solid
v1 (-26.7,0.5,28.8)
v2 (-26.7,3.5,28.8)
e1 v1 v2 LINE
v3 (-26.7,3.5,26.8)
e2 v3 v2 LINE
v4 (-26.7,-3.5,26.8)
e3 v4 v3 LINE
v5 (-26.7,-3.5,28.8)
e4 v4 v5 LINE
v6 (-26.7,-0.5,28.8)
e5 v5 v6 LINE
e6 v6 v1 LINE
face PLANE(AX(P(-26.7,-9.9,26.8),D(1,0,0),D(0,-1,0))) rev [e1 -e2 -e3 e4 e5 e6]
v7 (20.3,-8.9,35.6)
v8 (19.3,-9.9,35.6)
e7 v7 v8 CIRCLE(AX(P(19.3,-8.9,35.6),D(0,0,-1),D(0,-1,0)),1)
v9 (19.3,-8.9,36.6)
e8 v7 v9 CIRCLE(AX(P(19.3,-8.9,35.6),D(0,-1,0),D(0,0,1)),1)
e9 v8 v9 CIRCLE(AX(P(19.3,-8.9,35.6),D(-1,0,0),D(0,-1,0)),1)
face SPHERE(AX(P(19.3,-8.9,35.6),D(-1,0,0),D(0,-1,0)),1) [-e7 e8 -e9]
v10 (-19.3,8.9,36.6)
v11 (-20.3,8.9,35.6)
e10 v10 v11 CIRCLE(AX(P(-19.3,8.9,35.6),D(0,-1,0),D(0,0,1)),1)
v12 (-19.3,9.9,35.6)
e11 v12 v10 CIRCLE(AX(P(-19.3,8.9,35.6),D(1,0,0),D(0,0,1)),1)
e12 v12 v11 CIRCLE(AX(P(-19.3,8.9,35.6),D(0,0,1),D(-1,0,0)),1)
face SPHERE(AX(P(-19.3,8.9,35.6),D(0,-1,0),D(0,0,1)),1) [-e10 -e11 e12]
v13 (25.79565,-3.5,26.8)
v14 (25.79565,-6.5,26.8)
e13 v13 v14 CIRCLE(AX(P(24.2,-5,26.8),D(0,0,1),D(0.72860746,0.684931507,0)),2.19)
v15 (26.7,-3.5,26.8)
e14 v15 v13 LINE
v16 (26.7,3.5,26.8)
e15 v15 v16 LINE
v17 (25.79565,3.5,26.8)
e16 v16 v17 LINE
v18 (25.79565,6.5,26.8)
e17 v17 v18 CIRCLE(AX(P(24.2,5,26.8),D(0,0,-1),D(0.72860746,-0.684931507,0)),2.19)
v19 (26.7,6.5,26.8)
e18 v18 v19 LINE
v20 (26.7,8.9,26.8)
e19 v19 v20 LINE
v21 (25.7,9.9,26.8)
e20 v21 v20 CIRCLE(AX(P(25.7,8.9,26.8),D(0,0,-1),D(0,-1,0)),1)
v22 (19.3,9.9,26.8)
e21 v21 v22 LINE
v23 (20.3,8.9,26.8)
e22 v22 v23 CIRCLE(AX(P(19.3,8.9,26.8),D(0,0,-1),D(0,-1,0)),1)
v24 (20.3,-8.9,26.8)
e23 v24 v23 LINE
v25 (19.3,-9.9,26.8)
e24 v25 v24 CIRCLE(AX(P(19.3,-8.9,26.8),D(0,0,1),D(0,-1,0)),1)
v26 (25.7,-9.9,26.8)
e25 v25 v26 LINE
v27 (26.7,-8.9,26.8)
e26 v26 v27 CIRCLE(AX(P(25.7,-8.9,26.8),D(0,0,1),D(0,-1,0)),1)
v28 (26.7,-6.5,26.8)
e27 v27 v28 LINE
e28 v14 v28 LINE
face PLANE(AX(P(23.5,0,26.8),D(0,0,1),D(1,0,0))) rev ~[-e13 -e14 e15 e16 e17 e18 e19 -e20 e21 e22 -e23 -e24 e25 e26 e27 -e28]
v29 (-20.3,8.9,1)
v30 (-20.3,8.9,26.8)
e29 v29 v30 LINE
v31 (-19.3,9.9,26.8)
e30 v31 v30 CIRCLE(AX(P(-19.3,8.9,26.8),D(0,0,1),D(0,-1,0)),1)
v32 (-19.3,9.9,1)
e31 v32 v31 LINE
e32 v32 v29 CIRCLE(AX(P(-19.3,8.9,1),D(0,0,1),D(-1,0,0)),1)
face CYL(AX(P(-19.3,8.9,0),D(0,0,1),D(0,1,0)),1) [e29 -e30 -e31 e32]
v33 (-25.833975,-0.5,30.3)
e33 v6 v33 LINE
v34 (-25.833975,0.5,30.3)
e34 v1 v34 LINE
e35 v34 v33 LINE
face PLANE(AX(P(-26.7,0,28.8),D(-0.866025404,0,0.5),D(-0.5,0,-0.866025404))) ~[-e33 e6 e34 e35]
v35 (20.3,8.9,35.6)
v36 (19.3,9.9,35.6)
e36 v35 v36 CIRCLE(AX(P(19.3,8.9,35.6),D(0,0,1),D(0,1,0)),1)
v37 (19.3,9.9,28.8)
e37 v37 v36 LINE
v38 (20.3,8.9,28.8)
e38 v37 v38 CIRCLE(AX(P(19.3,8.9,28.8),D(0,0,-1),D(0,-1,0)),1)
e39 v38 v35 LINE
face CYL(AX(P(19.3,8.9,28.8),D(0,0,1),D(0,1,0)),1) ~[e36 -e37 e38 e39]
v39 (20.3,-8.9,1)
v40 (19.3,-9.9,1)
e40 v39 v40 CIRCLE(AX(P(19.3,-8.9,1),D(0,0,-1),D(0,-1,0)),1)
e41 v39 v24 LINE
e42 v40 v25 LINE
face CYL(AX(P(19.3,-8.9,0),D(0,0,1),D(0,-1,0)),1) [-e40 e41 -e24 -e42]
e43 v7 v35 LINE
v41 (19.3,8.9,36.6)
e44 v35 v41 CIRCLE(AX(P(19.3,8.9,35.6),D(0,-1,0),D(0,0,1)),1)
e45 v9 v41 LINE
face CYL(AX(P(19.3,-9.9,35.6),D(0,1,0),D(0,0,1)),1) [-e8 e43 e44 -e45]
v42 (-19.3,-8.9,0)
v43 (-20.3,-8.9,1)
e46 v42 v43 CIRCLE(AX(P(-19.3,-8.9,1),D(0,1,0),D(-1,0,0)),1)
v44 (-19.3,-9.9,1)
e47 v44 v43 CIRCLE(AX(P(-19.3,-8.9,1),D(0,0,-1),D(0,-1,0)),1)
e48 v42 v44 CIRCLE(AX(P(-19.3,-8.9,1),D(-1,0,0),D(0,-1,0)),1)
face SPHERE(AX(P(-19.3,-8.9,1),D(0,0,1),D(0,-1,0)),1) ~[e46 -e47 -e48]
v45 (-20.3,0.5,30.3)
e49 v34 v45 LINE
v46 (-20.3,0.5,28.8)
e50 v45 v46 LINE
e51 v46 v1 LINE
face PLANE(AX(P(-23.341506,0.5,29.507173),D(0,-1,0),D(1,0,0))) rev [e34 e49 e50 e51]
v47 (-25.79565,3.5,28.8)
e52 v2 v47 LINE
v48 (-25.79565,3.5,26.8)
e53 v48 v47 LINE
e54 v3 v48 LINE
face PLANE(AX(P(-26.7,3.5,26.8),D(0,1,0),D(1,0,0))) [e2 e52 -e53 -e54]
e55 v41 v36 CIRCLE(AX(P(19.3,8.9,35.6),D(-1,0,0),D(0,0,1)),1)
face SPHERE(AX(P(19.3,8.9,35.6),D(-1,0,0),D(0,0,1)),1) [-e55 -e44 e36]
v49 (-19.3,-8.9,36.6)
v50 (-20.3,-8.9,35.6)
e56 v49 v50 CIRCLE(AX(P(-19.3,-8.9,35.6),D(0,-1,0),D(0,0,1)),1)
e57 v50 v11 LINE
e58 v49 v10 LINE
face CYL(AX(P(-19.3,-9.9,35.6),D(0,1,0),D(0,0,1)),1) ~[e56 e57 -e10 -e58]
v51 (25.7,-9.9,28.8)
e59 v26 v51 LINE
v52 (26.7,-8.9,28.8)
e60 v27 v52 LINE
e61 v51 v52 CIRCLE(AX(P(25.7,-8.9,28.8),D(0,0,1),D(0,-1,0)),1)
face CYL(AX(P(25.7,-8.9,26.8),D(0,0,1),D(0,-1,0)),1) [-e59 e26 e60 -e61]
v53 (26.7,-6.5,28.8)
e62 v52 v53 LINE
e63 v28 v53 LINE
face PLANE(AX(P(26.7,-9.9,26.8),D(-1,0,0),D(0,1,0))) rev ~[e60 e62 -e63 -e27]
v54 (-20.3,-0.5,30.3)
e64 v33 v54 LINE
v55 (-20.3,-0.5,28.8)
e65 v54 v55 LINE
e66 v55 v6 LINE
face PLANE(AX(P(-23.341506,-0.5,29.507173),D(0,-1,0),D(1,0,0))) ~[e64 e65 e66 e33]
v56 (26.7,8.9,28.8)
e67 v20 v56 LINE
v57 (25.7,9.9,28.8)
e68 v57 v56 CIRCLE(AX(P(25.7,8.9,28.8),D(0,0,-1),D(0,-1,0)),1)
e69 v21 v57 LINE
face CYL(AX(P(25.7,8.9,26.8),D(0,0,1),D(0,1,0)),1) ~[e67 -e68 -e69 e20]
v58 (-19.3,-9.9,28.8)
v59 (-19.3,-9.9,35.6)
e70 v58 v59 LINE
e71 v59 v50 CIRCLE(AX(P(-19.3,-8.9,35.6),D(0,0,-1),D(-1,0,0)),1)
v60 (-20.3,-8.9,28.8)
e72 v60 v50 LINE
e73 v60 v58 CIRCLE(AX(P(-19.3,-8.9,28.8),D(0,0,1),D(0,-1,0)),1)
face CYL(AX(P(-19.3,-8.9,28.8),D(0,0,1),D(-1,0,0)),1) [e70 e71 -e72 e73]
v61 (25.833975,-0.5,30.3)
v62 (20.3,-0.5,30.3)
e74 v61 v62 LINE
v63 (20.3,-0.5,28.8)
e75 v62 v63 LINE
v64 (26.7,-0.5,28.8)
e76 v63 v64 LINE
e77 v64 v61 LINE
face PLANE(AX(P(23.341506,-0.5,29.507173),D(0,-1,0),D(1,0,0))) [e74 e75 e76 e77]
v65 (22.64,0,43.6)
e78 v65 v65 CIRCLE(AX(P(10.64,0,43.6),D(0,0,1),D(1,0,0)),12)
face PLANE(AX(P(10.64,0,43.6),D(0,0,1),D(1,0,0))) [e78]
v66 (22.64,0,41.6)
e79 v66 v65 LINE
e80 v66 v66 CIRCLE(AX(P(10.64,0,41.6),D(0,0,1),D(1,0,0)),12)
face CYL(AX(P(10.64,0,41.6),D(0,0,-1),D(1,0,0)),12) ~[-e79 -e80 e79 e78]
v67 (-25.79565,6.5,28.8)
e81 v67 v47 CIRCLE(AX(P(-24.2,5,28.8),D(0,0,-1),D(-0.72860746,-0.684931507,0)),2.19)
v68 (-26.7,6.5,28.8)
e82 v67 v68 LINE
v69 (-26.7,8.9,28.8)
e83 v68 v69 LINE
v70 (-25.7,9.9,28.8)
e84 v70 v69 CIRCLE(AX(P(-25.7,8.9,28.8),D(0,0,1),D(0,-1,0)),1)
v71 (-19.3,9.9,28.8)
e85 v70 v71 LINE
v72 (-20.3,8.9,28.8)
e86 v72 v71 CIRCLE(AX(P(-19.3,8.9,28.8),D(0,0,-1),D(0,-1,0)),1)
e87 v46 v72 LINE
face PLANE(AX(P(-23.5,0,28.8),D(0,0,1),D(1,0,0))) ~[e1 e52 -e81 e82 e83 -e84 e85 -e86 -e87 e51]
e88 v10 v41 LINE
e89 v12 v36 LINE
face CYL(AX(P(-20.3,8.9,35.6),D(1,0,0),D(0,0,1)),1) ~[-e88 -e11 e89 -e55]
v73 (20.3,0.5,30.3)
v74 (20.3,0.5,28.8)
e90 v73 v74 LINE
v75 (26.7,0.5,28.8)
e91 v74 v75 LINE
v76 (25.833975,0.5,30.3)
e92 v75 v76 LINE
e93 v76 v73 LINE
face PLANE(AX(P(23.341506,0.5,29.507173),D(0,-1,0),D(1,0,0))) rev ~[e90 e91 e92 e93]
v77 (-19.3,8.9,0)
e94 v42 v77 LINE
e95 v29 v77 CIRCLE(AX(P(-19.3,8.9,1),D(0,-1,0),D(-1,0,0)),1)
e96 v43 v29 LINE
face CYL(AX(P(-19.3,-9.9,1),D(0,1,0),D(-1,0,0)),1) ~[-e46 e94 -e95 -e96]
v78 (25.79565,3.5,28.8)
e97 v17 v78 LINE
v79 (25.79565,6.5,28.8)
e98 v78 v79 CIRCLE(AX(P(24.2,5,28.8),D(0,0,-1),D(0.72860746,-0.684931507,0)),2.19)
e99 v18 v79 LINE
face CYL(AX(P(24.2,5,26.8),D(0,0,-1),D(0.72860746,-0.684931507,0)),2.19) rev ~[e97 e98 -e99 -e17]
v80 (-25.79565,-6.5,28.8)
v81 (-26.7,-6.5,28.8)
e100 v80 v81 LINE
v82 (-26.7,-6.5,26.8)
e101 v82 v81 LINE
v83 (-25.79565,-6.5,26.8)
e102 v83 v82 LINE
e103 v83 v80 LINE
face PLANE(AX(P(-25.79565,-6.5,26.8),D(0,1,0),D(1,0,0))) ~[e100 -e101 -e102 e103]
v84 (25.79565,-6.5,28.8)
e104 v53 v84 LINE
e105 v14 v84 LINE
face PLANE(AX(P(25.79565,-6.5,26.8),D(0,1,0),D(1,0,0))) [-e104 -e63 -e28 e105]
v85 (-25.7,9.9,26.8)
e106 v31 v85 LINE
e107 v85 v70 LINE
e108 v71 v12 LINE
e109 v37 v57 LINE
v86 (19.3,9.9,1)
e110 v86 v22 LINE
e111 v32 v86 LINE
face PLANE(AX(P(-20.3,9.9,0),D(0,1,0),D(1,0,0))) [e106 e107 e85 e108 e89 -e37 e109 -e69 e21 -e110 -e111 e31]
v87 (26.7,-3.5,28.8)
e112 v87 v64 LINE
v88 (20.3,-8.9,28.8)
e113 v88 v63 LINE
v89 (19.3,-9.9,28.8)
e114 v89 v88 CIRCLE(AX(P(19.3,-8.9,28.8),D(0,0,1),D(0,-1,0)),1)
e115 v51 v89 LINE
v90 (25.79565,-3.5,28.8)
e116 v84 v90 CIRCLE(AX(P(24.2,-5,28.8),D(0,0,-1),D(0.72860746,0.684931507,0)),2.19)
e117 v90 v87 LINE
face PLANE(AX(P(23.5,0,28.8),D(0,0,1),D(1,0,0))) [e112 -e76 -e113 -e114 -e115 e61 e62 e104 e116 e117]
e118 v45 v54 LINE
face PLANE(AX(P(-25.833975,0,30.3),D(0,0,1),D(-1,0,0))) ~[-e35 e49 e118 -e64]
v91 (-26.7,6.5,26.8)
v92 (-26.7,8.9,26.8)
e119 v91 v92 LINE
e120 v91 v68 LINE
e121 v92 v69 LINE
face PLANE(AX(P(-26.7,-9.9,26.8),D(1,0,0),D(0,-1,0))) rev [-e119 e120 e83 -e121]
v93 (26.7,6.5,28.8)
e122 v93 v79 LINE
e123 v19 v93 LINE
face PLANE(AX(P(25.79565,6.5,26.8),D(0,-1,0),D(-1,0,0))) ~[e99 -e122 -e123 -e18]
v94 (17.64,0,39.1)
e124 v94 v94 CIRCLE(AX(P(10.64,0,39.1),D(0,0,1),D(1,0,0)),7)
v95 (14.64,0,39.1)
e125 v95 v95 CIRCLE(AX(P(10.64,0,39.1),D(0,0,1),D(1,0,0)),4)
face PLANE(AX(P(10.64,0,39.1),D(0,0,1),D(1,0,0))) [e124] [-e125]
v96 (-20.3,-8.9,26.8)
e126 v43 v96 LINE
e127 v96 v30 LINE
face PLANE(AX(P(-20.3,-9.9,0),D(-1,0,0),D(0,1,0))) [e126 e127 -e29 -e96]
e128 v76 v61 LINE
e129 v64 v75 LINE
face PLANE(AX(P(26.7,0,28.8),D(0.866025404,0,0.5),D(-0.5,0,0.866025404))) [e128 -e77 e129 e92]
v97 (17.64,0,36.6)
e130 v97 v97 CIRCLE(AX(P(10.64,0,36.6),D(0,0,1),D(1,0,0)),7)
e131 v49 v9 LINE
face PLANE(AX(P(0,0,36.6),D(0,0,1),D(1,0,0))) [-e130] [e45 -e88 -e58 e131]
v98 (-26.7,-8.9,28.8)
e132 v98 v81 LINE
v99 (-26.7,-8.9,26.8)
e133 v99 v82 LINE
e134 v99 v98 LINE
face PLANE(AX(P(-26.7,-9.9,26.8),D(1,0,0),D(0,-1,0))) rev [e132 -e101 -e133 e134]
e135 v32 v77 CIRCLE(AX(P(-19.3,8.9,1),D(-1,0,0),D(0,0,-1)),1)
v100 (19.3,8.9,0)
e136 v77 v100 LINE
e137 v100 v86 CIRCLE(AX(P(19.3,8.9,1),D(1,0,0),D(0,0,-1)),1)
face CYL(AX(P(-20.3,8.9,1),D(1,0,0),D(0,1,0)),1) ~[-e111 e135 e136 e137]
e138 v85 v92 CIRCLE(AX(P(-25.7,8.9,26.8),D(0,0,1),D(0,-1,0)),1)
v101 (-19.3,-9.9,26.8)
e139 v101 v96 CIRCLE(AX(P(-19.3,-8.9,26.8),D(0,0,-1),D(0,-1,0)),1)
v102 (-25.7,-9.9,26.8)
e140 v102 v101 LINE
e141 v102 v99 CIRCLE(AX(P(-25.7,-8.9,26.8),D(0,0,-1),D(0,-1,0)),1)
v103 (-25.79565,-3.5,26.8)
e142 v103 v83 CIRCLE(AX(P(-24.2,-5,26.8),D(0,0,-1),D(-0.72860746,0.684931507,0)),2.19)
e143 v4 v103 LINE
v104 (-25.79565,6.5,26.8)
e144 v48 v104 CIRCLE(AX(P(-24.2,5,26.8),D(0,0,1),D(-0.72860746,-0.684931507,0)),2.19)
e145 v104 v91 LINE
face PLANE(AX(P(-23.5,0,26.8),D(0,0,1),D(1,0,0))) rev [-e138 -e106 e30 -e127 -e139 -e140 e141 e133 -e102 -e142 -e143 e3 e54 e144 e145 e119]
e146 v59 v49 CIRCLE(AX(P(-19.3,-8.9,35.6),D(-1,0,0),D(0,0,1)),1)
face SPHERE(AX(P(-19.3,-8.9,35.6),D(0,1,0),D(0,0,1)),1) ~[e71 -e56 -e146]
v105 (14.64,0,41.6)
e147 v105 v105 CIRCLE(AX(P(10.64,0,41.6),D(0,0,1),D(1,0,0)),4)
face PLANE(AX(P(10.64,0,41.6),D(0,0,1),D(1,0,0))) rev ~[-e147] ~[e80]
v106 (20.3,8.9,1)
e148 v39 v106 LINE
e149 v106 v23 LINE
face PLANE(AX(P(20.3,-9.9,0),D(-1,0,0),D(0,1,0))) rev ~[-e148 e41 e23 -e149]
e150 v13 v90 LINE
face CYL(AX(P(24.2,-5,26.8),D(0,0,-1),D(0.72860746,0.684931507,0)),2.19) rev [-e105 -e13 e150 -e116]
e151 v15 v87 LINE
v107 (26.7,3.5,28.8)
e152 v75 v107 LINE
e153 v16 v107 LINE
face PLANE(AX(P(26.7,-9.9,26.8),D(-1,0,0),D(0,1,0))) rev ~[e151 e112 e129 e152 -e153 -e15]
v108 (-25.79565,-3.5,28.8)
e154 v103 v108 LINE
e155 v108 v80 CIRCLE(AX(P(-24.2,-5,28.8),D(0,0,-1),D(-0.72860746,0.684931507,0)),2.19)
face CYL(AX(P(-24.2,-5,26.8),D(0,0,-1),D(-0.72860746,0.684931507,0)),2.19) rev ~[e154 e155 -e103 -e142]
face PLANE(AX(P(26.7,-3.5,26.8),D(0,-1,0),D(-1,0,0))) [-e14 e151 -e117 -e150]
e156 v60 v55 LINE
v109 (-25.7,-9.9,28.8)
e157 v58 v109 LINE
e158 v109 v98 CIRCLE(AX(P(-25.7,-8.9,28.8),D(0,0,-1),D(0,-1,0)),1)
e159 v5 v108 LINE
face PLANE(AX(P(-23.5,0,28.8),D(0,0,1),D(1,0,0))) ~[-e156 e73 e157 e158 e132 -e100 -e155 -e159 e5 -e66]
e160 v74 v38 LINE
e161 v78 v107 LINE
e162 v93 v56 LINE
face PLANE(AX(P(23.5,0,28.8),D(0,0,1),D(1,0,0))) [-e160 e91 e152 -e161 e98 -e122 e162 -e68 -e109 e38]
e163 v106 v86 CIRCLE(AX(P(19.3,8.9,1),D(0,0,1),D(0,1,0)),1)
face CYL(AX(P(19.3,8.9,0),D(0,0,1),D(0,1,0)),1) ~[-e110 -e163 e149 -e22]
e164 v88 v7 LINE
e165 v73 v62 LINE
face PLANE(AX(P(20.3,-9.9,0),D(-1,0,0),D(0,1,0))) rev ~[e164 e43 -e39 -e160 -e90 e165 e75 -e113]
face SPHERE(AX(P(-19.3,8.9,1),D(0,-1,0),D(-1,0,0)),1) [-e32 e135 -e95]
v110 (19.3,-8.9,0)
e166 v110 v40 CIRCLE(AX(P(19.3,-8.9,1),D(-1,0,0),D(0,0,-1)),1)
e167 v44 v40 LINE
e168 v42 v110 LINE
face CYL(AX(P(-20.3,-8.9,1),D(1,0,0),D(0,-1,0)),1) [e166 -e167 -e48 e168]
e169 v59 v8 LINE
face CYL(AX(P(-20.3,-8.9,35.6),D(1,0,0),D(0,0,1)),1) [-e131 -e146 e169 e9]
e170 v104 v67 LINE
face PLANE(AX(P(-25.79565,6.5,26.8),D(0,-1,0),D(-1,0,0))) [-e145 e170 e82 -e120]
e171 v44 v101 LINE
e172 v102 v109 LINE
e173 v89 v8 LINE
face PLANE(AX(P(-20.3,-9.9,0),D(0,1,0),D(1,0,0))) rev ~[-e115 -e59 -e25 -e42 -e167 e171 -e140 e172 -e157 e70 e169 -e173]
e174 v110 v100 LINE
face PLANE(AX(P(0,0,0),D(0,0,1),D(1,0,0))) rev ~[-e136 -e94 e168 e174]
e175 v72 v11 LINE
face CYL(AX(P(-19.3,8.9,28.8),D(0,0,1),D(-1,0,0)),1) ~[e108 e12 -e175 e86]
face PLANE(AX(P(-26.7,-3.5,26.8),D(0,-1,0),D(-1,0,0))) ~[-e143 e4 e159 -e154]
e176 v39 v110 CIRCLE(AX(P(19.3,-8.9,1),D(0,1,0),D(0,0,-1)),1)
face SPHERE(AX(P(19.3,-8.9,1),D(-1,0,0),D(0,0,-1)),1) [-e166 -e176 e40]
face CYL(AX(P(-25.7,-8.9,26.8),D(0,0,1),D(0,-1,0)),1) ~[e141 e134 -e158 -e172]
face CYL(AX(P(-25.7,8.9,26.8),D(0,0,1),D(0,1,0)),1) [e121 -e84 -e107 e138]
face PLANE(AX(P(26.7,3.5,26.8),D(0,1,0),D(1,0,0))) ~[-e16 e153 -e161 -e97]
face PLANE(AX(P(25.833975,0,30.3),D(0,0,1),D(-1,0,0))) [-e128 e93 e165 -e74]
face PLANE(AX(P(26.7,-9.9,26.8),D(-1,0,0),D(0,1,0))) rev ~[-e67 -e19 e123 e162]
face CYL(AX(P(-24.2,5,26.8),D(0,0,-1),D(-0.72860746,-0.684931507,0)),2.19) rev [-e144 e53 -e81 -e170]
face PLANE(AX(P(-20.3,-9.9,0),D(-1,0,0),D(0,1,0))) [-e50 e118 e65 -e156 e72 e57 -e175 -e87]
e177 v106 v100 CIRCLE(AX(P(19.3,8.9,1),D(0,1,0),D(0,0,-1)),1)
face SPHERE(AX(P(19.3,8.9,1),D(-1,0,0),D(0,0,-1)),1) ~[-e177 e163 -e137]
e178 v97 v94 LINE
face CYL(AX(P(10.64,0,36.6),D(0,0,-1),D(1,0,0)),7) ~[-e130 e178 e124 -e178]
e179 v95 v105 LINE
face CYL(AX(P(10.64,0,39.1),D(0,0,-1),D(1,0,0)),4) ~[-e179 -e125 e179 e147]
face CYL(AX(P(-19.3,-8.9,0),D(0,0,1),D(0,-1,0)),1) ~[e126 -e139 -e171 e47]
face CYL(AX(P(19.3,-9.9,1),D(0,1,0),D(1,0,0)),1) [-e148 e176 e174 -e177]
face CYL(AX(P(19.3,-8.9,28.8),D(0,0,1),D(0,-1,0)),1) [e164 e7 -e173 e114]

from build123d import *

# Parameters (mm, degrees)
F1_W              = 40.6
F1_H              = 19.8
F2_DEPTH          = 36.6
F3_R              = 7
F4_DEPTH          = 2.5
F5_R              = 4
F6_DEPTH          = 2.5
F7_R              = 12
F8_DEPTH          = 2
F10_W             = 6.4
F10_H             = 19.8
F11_DEPTH         = 2
F13_DEPTH         = 4
F13_COPIES2_COUNT = 2
F14_R             = 1
F16_DEPTH         = 0.5


# Not quite as in the source:
# - a pattern or mirror of a feature is missing from the dataset's text; its kind, count and spacing are read off the source's solid


with BuildPart() as f2:
    # F1 (on Top) → F2 (new body)
    with BuildSketch(Plane.XY):
        Rectangle(F1_W, F1_H)
    extrude(amount=F2_DEPTH)

    # F3 (on face) → F4 (join)
    with BuildSketch(Plane.XY.offset(36.6)):
        with Locations((10.64, 0)):
            Circle(F3_R)
    extrude(amount=F4_DEPTH)

    # F5 (on face) → F6 (join)
    with BuildSketch(Plane.XY.offset(39.1)):
        with Locations((10.64, 0)):
            Circle(F5_R)
    extrude(amount=F6_DEPTH)

    # F7 (on face) → F8 (join)
    with BuildSketch(Plane.XY.offset(41.6)):
        with Locations((10.64, 0)):
            Circle(F7_R)
    extrude(amount=F8_DEPTH)

    # F10 (on offset) → F11 (join)
    with BuildSketch(Plane.XY.offset(26.8)):
        with Locations((23.5, 0)):
            Rectangle(F10_W, F10_H)
    f11 = extrude(amount=F11_DEPTH)

    # F11_copies: F11 across plane
    add(f11.mirror(Plane(origin=(0, 0, 0), x_dir=(0, 0, -1), z_dir=(-1, 0, 0))))

    # F12 (on offset) → F13 (cut)
    with BuildSketch(Plane.XY.offset(26.8)):
        with BuildLine():
            Line((26.7, -3.5), (25.7956503376, -3.5))
            ThreePointArc((25.7956503376, -3.5), (22.01, -5), (25.7956503376, -6.5))
            Line((25.7956503376, -6.5), (26.7, -6.5))
            Line((26.7, -6.5), (26.7, -3.5))
        make_face()
    f13 = extrude(amount=F13_DEPTH, mode=Mode.SUBTRACT)

    # F13_copies: F13 across plane
    add(f13.mirror(Plane(origin=(0, 0, 0), x_dir=(0, 0, -1), z_dir=(-1, 0, 0))), mode=Mode.SUBTRACT)

    # F13_copies1: F13 across plane
    add(f13.mirror(Plane.ZX), mode=Mode.SUBTRACT)

    # F13_copies2: F13 ×2 about axis
    f13_copies2_axis = Axis((0, 0, 0), (0, 0, 1))
    for i in range(1, F13_COPIES2_COUNT):
        add(f13.rotate(f13_copies2_axis, i * 360 / F13_COPIES2_COUNT), mode=Mode.SUBTRACT)

    # F14
    f14_edges = [f2.edges().sort_by_distance(p)[0] for p in [
        (-20.3, -9.9, 13.4),
        (0, -9.9, 0),
        (-20.3, 0, 0),
        (-20.3, 9.9, 13.4),
        (0, 9.9, 0),
        (20.3, 0, 0),
        (20.3, 9.9, 13.4),
        (20.3, -9.9, 13.4),
        (-20.3, 0, 36.6),
        (0, 9.9, 36.6),
        (0, -9.9, 36.6),
        (20.3, -9.9, 32.7),
        (20.3, 0, 36.6),
        (20.3, 9.9, 32.7),
        (26.7, -9.9, 27.8),
        (26.7, 9.9, 27.8),
        (-20.3, 9.9, 32.7),
        (-26.7, 9.9, 27.8),
        (-20.3, -9.9, 32.7),
        (-26.7, -9.9, 27.8),
    ]]
    fillet(f14_edges, radius=F14_R)

    # F15 (on Front) → F16 (join, symmetric)
    with BuildSketch(Plane.XZ):
        Polygon((26.7, 28.8), (25.8339745962, 30.3), (20.3, 30.3), (20.3, 28.8), align=None)
    f16 = extrude(amount=F16_DEPTH, both=True)

    # F16_copies: F16 across plane
    add(f16.mirror(Plane(origin=(0, 0, 0), x_dir=(0, 0, -1), z_dir=(-1, 0, 0))))


solid = f2.part
